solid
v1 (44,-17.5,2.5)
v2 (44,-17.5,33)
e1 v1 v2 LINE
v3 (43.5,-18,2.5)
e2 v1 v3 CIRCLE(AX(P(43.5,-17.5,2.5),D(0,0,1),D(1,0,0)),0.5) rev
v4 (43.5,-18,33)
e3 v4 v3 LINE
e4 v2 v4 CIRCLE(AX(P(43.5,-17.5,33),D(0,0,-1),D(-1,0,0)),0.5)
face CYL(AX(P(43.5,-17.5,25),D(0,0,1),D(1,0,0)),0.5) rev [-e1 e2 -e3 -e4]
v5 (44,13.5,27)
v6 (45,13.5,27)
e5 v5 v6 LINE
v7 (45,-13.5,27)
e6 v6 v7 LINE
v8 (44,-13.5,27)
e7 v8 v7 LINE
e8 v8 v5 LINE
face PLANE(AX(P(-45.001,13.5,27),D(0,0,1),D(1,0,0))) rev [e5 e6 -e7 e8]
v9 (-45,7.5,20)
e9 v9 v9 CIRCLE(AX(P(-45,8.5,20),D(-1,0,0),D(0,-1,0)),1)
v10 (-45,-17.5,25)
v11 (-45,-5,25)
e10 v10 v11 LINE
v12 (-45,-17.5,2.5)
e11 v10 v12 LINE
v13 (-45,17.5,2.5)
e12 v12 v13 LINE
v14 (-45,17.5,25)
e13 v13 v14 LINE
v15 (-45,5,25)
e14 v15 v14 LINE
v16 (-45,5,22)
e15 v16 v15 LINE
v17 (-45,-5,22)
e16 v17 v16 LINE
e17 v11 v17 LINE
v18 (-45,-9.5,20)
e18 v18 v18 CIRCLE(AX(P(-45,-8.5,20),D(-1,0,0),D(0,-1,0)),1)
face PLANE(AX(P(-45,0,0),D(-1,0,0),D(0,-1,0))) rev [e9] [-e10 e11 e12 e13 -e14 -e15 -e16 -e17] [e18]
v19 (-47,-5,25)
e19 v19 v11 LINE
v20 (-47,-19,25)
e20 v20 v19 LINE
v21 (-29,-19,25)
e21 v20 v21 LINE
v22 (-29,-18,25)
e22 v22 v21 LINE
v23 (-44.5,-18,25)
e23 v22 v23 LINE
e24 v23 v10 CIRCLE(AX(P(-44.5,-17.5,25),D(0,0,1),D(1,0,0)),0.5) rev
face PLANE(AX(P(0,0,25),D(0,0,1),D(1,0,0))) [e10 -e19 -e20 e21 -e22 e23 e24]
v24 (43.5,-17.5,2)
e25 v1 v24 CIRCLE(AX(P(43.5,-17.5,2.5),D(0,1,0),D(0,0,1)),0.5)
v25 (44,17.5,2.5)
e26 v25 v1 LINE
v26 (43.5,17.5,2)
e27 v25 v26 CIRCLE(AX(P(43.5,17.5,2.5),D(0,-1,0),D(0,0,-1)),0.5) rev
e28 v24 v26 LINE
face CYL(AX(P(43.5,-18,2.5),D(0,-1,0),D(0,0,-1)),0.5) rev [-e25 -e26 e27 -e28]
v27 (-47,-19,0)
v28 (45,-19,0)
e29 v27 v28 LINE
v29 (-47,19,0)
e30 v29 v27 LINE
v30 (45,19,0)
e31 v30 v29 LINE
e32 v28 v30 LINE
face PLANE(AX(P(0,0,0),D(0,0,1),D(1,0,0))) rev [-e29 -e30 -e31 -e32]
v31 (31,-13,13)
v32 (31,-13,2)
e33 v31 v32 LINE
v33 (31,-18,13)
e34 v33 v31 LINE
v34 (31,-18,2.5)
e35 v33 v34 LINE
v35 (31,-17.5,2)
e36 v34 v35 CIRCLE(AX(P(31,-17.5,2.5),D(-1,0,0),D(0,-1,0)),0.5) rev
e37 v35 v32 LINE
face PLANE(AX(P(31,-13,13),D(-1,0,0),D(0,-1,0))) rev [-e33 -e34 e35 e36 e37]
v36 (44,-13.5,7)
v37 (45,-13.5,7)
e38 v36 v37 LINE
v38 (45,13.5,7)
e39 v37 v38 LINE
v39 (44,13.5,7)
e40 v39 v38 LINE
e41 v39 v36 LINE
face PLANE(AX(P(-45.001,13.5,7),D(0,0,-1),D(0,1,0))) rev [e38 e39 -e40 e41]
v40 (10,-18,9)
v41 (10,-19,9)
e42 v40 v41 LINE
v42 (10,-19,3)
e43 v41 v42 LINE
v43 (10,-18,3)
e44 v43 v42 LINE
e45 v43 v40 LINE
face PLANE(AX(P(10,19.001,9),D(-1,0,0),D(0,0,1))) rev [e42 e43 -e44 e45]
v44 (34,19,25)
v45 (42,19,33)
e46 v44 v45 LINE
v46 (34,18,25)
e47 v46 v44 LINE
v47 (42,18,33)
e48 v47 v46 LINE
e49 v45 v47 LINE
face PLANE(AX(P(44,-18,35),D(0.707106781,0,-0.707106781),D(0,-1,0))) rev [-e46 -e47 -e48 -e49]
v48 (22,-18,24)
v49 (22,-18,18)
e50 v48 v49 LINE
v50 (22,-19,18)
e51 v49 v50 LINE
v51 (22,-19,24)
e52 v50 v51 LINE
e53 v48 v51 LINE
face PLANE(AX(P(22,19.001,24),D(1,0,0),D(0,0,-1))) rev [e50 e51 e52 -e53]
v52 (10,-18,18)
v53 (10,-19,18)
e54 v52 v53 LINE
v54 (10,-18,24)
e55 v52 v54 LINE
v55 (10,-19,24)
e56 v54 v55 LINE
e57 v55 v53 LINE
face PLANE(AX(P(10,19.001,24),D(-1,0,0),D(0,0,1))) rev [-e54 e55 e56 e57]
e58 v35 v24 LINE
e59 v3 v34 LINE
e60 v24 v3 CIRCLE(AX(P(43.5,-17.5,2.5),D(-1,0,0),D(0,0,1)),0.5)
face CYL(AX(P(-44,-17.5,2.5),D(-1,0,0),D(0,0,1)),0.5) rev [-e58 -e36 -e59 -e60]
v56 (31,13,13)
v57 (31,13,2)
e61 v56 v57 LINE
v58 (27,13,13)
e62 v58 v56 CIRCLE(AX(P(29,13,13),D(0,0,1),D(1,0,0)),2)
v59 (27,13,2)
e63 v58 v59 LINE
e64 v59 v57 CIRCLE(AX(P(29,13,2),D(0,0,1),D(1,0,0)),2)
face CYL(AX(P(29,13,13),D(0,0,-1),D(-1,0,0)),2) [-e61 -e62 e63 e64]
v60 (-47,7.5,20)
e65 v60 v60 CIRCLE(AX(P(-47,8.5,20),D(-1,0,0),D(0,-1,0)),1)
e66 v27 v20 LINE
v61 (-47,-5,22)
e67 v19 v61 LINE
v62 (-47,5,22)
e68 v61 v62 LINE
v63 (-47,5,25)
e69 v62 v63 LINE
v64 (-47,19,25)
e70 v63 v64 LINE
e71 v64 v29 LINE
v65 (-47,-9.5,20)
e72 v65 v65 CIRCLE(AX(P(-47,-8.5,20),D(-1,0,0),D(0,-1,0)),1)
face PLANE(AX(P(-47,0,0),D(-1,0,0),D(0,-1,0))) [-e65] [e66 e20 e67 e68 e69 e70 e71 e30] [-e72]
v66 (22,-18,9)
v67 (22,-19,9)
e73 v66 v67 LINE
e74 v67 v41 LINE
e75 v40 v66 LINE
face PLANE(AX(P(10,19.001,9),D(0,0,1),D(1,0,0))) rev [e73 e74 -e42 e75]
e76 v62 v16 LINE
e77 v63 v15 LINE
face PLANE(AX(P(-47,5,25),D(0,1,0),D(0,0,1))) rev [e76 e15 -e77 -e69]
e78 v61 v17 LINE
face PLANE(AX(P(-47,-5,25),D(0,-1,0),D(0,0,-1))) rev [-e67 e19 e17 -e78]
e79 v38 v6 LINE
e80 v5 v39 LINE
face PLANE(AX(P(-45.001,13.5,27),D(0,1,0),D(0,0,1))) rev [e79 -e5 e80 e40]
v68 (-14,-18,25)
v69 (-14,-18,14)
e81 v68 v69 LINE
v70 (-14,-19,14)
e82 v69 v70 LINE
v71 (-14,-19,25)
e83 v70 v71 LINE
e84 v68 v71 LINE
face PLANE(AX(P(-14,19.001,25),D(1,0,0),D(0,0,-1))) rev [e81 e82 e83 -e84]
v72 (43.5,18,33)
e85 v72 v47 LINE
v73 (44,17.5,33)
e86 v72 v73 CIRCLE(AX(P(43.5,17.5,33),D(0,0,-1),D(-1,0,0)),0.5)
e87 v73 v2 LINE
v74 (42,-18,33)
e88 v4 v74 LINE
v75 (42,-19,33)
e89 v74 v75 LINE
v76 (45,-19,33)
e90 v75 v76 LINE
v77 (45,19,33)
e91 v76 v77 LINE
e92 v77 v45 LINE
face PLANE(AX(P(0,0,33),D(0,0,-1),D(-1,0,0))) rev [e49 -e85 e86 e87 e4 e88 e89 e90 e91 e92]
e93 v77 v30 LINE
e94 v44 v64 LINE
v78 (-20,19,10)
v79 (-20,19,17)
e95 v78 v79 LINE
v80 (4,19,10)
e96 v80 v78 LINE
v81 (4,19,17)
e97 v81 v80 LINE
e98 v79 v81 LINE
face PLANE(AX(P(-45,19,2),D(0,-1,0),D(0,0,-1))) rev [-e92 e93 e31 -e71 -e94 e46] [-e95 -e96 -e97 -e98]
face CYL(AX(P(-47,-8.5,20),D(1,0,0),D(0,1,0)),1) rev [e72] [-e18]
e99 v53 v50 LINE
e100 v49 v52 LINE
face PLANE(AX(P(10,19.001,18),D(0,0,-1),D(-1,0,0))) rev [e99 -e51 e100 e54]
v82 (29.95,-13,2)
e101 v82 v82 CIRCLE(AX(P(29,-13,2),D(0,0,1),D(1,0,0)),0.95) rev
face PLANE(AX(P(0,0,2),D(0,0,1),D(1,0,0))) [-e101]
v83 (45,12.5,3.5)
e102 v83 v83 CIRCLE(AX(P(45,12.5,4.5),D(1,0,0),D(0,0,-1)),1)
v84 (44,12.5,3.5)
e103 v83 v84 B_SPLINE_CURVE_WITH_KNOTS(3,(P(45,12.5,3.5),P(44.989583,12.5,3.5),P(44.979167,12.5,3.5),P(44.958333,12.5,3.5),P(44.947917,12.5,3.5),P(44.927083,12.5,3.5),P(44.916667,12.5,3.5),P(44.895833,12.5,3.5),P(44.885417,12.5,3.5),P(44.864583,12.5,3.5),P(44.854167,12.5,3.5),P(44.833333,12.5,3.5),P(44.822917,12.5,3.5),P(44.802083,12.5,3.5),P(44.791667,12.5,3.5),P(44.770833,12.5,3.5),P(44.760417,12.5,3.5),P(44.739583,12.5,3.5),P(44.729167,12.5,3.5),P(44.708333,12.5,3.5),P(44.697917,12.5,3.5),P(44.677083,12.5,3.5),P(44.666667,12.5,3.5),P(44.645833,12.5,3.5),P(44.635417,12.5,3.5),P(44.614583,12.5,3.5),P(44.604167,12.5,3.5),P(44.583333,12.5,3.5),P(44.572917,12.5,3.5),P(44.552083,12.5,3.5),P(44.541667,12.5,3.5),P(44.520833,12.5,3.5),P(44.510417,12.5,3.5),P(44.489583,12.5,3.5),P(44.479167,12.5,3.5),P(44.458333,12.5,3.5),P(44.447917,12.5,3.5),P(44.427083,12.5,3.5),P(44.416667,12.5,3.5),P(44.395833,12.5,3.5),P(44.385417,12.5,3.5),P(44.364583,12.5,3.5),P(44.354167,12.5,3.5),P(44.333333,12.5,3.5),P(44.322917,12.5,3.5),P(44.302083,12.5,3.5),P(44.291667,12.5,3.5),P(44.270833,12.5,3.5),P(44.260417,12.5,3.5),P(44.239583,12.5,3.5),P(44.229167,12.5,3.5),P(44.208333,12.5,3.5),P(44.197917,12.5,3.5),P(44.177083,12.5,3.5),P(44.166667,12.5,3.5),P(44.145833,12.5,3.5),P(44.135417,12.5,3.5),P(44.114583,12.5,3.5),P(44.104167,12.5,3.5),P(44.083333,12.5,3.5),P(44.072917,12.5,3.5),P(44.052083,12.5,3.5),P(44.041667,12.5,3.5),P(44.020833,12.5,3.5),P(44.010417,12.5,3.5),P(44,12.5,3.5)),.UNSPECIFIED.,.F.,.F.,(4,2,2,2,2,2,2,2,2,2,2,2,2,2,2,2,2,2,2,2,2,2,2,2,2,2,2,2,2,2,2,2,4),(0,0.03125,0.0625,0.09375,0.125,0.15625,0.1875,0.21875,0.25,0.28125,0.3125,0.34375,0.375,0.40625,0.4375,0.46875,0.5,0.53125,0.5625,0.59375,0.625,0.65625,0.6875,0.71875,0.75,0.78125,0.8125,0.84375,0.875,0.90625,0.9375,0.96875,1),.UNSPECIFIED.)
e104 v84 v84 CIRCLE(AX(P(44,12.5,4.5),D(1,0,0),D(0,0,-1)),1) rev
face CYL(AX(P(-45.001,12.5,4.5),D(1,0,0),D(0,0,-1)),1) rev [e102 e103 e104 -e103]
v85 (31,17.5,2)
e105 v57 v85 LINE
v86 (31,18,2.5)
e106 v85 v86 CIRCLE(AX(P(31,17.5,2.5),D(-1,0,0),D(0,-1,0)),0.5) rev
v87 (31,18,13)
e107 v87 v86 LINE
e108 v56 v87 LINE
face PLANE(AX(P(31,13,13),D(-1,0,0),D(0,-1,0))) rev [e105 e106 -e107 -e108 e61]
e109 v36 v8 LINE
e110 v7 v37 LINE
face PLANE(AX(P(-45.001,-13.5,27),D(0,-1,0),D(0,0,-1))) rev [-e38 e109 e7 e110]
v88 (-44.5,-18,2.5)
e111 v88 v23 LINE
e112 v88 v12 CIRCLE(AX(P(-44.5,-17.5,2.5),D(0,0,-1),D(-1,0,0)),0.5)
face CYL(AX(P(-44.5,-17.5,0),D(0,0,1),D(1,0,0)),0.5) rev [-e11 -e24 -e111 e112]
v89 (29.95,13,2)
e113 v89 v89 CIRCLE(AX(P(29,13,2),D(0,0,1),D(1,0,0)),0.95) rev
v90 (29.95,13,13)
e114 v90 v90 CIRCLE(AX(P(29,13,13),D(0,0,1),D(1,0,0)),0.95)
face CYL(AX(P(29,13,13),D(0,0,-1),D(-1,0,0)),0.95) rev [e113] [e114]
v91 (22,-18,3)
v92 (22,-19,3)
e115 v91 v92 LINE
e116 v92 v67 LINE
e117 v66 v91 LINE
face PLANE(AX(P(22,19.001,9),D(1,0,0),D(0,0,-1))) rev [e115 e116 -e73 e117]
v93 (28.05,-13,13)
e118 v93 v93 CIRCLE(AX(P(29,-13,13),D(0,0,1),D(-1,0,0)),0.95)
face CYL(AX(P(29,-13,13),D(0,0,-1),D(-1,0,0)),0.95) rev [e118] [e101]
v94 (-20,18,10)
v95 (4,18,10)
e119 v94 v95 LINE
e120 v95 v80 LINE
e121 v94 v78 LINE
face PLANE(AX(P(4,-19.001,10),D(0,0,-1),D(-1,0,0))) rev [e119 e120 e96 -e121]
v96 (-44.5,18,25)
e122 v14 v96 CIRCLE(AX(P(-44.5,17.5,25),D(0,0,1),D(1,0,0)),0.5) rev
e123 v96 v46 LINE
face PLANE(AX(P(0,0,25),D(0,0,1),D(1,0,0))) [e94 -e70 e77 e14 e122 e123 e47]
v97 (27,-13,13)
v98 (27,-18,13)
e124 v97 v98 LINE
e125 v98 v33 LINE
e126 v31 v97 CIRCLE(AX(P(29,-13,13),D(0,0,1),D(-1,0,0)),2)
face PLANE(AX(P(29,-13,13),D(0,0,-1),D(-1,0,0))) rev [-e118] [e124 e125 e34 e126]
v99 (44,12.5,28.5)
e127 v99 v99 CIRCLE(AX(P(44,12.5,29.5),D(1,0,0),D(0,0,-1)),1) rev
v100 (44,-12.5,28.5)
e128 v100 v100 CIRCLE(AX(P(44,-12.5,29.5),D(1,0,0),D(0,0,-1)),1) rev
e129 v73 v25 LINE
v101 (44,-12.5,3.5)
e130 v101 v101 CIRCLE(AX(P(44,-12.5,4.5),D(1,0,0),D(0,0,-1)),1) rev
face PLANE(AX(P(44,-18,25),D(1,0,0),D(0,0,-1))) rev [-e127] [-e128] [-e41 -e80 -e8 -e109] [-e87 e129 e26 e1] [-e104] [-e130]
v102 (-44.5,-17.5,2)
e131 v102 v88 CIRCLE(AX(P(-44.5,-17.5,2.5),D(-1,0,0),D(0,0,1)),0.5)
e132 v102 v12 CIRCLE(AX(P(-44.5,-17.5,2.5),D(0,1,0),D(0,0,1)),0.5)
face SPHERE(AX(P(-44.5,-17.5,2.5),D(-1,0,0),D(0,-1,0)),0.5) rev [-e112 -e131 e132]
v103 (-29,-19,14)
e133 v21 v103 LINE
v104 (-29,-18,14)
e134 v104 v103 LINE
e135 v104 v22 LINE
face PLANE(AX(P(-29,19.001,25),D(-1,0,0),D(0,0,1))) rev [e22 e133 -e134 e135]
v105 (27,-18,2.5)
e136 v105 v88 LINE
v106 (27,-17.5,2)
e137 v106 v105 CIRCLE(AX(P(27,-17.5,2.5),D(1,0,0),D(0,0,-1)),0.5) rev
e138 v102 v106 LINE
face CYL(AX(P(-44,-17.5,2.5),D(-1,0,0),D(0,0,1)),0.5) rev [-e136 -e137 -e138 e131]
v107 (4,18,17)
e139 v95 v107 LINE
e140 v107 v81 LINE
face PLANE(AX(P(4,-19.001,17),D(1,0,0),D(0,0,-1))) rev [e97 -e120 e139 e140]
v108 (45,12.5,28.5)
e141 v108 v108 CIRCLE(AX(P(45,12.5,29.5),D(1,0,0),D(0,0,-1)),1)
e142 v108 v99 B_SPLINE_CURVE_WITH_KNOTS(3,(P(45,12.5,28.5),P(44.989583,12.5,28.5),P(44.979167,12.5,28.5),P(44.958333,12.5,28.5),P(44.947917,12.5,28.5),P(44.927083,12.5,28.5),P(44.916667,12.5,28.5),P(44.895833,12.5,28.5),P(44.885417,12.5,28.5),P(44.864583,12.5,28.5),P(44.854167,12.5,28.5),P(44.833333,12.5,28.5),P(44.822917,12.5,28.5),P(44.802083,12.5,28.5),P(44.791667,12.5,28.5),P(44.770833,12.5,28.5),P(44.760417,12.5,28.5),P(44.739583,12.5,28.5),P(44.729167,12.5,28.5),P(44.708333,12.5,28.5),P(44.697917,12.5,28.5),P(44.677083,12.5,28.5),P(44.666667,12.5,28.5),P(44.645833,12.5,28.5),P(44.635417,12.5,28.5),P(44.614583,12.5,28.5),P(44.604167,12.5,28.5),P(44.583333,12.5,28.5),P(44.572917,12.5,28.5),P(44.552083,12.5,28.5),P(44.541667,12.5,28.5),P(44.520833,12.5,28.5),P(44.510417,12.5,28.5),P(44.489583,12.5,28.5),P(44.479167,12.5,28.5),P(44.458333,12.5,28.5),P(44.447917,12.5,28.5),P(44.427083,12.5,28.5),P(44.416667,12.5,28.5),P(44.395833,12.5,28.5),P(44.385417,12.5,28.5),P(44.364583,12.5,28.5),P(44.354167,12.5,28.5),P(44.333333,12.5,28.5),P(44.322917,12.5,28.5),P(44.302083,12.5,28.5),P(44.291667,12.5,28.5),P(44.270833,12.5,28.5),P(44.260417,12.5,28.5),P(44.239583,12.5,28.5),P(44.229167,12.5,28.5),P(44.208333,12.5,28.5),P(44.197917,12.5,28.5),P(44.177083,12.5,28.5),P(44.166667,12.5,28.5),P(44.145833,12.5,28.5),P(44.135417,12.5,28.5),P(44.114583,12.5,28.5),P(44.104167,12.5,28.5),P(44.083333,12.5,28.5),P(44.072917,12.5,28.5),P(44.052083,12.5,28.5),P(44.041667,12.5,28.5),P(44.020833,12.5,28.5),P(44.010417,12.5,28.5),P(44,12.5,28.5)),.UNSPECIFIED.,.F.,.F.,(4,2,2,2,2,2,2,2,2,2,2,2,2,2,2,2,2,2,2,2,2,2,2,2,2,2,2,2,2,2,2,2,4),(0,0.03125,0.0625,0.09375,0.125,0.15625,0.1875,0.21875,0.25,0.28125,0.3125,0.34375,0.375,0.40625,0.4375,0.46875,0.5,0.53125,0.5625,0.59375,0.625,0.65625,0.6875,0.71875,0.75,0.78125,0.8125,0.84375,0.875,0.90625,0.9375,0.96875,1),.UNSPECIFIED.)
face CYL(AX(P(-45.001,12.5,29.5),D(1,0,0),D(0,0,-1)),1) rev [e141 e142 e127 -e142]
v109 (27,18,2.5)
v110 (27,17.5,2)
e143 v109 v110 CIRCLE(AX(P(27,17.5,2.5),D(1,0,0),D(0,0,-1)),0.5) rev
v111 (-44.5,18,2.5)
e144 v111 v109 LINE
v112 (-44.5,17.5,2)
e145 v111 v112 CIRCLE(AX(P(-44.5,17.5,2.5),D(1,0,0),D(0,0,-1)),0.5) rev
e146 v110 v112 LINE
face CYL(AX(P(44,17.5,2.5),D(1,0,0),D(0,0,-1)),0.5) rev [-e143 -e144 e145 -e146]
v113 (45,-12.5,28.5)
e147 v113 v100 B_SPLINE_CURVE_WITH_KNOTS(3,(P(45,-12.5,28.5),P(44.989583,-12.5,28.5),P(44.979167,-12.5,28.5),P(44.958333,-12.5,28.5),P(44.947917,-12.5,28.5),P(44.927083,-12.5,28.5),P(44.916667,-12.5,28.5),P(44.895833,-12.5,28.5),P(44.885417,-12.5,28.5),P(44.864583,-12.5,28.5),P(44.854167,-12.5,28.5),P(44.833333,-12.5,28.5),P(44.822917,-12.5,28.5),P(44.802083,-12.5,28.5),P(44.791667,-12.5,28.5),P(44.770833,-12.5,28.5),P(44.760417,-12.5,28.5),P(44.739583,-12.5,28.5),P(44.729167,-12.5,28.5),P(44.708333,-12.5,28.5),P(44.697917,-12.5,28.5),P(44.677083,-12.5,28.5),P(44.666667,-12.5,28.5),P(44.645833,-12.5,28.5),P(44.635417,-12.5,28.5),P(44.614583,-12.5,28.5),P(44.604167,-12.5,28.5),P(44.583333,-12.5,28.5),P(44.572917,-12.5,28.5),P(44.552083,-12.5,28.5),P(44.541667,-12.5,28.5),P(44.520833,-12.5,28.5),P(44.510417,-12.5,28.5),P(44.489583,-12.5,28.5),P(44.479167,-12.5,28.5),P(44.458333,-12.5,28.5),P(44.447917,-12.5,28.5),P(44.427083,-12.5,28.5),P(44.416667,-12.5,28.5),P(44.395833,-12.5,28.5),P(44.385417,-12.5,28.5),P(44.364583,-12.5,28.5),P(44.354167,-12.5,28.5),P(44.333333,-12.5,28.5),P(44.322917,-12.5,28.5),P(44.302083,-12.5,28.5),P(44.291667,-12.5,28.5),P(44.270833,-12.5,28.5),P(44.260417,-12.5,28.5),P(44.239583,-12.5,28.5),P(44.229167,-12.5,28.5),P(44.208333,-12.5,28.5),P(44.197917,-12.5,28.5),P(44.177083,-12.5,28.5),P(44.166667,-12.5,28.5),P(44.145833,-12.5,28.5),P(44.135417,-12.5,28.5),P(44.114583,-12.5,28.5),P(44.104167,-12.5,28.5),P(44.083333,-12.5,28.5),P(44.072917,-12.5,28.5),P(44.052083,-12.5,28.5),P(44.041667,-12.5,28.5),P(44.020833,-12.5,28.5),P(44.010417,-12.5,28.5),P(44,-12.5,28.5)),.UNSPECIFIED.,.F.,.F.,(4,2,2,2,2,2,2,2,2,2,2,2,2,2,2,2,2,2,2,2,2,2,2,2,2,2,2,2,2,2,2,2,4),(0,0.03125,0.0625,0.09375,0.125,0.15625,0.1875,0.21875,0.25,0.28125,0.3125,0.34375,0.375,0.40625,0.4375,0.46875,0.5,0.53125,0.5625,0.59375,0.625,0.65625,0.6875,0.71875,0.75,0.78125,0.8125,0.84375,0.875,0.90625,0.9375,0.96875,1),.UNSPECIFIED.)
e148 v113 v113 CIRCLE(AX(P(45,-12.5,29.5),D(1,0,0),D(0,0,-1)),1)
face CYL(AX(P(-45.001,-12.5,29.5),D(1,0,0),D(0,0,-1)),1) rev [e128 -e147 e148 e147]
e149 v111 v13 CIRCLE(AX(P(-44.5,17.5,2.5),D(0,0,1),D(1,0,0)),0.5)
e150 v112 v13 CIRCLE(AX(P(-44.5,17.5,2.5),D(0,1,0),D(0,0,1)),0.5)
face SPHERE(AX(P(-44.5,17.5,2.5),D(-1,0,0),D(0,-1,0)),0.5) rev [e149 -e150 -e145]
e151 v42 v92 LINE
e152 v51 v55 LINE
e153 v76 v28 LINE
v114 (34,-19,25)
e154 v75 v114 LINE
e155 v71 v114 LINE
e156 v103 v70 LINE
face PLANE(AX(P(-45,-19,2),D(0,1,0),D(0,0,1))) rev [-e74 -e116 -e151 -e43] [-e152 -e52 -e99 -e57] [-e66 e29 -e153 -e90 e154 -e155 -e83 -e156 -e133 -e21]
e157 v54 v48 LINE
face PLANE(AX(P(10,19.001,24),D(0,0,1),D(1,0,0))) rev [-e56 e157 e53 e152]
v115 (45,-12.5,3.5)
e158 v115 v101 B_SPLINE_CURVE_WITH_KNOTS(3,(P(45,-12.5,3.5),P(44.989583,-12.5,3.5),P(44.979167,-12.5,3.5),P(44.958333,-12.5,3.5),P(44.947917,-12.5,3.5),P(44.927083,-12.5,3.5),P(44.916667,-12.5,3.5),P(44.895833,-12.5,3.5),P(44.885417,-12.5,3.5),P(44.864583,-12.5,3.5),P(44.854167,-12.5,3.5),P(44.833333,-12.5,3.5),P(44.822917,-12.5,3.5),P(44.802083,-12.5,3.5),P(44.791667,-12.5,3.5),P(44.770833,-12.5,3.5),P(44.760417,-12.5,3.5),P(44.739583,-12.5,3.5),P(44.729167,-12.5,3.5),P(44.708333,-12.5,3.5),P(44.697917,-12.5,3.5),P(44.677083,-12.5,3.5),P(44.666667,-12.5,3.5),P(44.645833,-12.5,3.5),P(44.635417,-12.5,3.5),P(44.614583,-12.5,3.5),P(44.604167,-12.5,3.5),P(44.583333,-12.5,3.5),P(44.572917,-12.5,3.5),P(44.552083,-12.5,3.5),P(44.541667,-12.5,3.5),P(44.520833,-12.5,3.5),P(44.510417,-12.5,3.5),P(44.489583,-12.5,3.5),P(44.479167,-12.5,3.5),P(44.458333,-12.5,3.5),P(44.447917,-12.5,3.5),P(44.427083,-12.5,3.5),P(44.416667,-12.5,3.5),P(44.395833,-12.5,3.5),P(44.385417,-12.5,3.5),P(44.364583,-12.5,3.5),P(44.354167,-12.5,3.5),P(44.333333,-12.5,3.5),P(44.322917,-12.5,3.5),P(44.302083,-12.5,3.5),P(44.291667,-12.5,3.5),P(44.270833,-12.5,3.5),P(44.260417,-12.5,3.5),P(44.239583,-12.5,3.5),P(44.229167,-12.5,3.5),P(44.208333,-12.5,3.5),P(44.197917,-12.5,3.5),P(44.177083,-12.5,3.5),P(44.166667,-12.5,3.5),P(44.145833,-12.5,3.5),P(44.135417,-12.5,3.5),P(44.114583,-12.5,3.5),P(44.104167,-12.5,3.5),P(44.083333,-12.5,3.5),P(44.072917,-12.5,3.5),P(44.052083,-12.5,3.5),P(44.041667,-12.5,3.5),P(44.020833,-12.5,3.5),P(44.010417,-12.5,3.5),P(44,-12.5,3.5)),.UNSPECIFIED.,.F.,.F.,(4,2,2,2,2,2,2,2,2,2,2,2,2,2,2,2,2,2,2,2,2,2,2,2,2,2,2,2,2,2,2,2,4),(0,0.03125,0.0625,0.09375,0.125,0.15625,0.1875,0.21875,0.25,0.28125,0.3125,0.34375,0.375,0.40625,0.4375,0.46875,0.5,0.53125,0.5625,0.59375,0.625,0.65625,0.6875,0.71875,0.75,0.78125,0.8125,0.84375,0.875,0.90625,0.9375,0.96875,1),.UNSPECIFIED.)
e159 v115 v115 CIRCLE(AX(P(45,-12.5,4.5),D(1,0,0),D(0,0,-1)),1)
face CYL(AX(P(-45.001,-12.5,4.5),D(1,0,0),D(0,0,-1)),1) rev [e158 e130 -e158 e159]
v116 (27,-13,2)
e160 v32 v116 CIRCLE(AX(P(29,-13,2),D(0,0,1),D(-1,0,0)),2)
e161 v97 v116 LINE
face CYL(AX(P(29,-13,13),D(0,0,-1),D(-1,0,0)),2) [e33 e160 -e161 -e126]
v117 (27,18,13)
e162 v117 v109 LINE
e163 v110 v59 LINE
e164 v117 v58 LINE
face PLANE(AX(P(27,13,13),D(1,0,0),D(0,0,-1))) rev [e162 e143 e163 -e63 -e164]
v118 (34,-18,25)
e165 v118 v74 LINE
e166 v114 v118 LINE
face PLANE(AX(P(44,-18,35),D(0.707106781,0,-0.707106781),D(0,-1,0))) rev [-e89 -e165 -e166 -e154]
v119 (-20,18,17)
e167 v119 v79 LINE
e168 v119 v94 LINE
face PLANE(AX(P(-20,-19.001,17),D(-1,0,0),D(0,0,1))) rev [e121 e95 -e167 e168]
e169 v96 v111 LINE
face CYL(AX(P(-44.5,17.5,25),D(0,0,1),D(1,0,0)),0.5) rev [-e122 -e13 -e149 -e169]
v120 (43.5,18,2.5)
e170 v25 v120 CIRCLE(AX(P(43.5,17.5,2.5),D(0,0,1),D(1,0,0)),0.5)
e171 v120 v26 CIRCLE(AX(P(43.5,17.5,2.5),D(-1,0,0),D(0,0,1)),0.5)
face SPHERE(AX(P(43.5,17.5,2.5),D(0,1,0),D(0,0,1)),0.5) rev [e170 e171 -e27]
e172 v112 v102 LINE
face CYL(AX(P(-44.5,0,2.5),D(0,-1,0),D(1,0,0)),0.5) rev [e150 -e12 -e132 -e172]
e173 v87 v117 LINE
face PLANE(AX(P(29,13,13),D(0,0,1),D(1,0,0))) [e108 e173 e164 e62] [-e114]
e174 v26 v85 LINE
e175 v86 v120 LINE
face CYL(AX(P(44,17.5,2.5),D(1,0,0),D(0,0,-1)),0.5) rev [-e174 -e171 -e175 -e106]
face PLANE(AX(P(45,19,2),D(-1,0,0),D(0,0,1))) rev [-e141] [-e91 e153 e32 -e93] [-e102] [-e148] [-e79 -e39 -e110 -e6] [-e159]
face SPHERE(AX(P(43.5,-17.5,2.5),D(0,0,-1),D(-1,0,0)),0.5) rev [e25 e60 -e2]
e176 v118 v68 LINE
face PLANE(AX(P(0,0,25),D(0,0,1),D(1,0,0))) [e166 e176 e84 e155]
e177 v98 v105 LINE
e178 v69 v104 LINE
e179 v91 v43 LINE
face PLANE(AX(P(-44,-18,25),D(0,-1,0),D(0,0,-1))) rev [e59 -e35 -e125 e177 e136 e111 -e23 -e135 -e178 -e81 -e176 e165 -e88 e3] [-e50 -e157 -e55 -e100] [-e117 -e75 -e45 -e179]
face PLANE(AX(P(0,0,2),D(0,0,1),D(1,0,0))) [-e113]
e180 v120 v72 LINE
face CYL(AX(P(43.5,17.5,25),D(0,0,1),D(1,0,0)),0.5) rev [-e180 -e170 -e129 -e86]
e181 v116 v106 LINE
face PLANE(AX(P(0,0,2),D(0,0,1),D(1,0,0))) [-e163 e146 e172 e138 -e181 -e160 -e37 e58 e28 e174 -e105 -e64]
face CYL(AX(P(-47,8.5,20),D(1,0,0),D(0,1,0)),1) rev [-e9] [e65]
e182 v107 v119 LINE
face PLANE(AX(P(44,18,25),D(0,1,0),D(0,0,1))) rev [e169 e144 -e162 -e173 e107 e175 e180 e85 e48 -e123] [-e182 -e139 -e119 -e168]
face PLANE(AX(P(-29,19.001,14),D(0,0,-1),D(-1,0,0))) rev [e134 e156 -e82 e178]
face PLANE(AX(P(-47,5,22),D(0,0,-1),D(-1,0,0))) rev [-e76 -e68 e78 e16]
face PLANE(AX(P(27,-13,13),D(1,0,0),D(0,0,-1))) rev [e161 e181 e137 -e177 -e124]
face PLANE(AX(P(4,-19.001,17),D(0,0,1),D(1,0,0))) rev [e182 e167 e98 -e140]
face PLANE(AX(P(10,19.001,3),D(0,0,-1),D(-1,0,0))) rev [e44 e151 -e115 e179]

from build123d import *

# Parameters (mm, degrees)
SKETCH_1_W          = 90
SKETCH_1_H          = 38
EXTRUDE_1_DEPTH     = 2
EXTRUDE_2_DEPTH     = 23
CUT_EXTRUDE_1_REACH = 65.984
SKETCH_3_W          = 12
SKETCH_3_H          = 6
SKETCH_3_W_2        = 15
SKETCH_3_H_2        = 11
CUT_EXTRUDE_2_REACH = 65.984
SKETCH_4_W          = 24
SKETCH_4_H          = 7
SKETCH_7_W          = 1
SKETCH_7_H          = 38
EXTRUDE_3_DEPTH     = 8
CUT_EXTRUDE_3_REACH = 99.724
SKETCH_6_W          = 20
SKETCH_6_H          = 27
CUT_EXTRUDE_4_REACH = 99.724
SKETCH_8_R          = 1
CHAMFER_1_SIZE      = 10
FILLET_1_R          = 0.5
SKETCH_10_R         = 0.95
EXTRUDE_4_DEPTH     = 11
SKETCH_11_R         = 1
EXTRUDE_5_DEPTH     = 2
FILLET_2_R          = 0.5


with BuildPart() as part:
    # 草图1 → 凸台-拉伸1 (new body)
    with BuildSketch(Plane.XY):
        Rectangle(SKETCH_1_W, SKETCH_1_H)
    extrude(amount=EXTRUDE_1_DEPTH)

    # 草图2 → 凸台-拉伸2 (add)
    with BuildSketch(Plane.XY.offset(2)):
        Polygon((44, 18), (-44, 18), (-45, 18), (-45, 19), (45, 19), (45, -19), (-45, -19), (-45, -18), (-44, -18), (44, -18), align=None)
    extrude(amount=EXTRUDE_2_DEPTH)

    # 草图3 → 切除-拉伸1 (cut, up to next)
    with BuildSketch(Plane.XZ.offset(19), mode=Mode.PRIVATE) as cut_extrude_1_sk1:
        with Locations((16, 6)):
            Rectangle(SKETCH_3_W, SKETCH_3_H)
    cut_extrude_1_tool1 = extrude(cut_extrude_1_sk1.sketch, amount=-CUT_EXTRUDE_1_REACH, mode=Mode.PRIVATE) & part.part
    # 草图3 → 切除-拉伸1 (cut, up to next)
    with BuildSketch(Plane.XZ.offset(19), mode=Mode.PRIVATE) as cut_extrude_1_sk2:
        with Locations((16, 21)):
            Rectangle(SKETCH_3_W, SKETCH_3_H)
    cut_extrude_1_tool2 = extrude(cut_extrude_1_sk2.sketch, amount=-CUT_EXTRUDE_1_REACH, mode=Mode.PRIVATE) & part.part
    # 草图3 → 切除-拉伸1 (cut, up to next)
    with BuildSketch(Plane.XZ.offset(19), mode=Mode.PRIVATE) as cut_extrude_1_sk3:
        with Locations((-21.5, 19.5)):
            Rectangle(SKETCH_3_W_2, SKETCH_3_H_2)
    cut_extrude_1_tool3 = extrude(cut_extrude_1_sk3.sketch, amount=-CUT_EXTRUDE_1_REACH, mode=Mode.PRIVATE) & part.part
    add(cut_extrude_1_tool1.solids().sort_by_distance((16, -19, 6))[0], mode=Mode.SUBTRACT)
    add(cut_extrude_1_tool2.solids().sort_by_distance((16, -19, 21))[0], mode=Mode.SUBTRACT)
    add(cut_extrude_1_tool3.solids().sort_by_distance((-21.5, -19, 19.5))[0], mode=Mode.SUBTRACT)

    # 草图4 → 切除-拉伸2 (cut, up to next)
    with BuildSketch(Plane(origin=(0, 19, 0), x_dir=(1, 0, 0), z_dir=(0, 1, 0)), mode=Mode.PRIVATE) as cut_extrude_2_sk1:
        with Locations((-8, -13.5)):
            Rectangle(SKETCH_4_W, SKETCH_4_H)
    cut_extrude_2_tool1 = extrude(cut_extrude_2_sk1.sketch, amount=-CUT_EXTRUDE_2_REACH, mode=Mode.PRIVATE) & part.part
    add(cut_extrude_2_tool1.solids().sort_by_distance((-8, 19, 13.5))[0], mode=Mode.SUBTRACT)

    # 草图7 → 凸台-拉伸3 (add)
    with BuildSketch(Plane.XY.offset(25)):
        with Locations((44.5, 0)):
            Rectangle(SKETCH_7_W, SKETCH_7_H)
    extrude(amount=EXTRUDE_3_DEPTH)

    # 草图6 → 切除-拉伸3 (cut, up to next)
    with BuildSketch(Plane(origin=(45, 0, 0), x_dir=(0, 0, -1), z_dir=(1, 0, 0)), mode=Mode.PRIVATE) as cut_extrude_3_sk1:
        with Locations((-17, 0)):
            Rectangle(SKETCH_6_W, SKETCH_6_H)
    cut_extrude_3_tool1 = extrude(cut_extrude_3_sk1.sketch, amount=-CUT_EXTRUDE_3_REACH, mode=Mode.PRIVATE) & part.part
    add(cut_extrude_3_tool1.solids().sort_by_distance((45, 0, 17))[0], mode=Mode.SUBTRACT)

    # 草图8 → 切除-拉伸4 (cut, up to next)
    with BuildSketch(Plane(origin=(45, 0, 0), x_dir=(0, 0, -1), z_dir=(1, 0, 0)), mode=Mode.PRIVATE) as cut_extrude_4_sk1:
        with Locations((-29.5, 12.5)):
            Circle(SKETCH_8_R)
    cut_extrude_4_tool1 = extrude(cut_extrude_4_sk1.sketch, amount=-CUT_EXTRUDE_4_REACH, mode=Mode.PRIVATE) & part.part
    # 草图8 → 切除-拉伸4 (cut, up to next)
    with BuildSketch(Plane(origin=(45, 0, 0), x_dir=(0, 0, -1), z_dir=(1, 0, 0)), mode=Mode.PRIVATE) as cut_extrude_4_sk2:
        with Locations((-29.5, -12.5)):
            Circle(SKETCH_8_R)
    cut_extrude_4_tool2 = extrude(cut_extrude_4_sk2.sketch, amount=-CUT_EXTRUDE_4_REACH, mode=Mode.PRIVATE) & part.part
    # 草图8 → 切除-拉伸4 (cut, up to next)
    with BuildSketch(Plane(origin=(45, 0, 0), x_dir=(0, 0, -1), z_dir=(1, 0, 0)), mode=Mode.PRIVATE) as cut_extrude_4_sk3:
        with Locations((-4.5, -12.5)):
            Circle(SKETCH_8_R)
    cut_extrude_4_tool3 = extrude(cut_extrude_4_sk3.sketch, amount=-CUT_EXTRUDE_4_REACH, mode=Mode.PRIVATE) & part.part
    # 草图8 → 切除-拉伸4 (cut, up to next)
    with BuildSketch(Plane(origin=(45, 0, 0), x_dir=(0, 0, -1), z_dir=(1, 0, 0)), mode=Mode.PRIVATE) as cut_extrude_4_sk4:
        with Locations((-4.5, 12.5)):
            Circle(SKETCH_8_R)
    cut_extrude_4_tool4 = extrude(cut_extrude_4_sk4.sketch, amount=-CUT_EXTRUDE_4_REACH, mode=Mode.PRIVATE) & part.part
    add(cut_extrude_4_tool1.solids().sort_by_distance((45, 12.5, 29.5))[0], mode=Mode.SUBTRACT)
    add(cut_extrude_4_tool2.solids().sort_by_distance((45, -12.5, 29.5))[0], mode=Mode.SUBTRACT)
    add(cut_extrude_4_tool3.solids().sort_by_distance((45, -12.5, 4.5))[0], mode=Mode.SUBTRACT)
    add(cut_extrude_4_tool4.solids().sort_by_distance((45, 12.5, 4.5))[0], mode=Mode.SUBTRACT)

    # 倒角1
    # the kernel refuses this chamfer: 10 mm, written as the material it adds along each edge
    with BuildSketch(Plane(origin=(44, 19, 25), x_dir=(-0.9996219169112968, 0, -0.027495876610586317), z_dir=(0, -1, 0))) as chamfer_1_piece_1_section:
        Polygon((CHAMFER_1_SIZE * 0.999621916911, -CHAMFER_1_SIZE * 0.0274958766106), (-CHAMFER_1_SIZE * 0.0274958766106, -CHAMFER_1_SIZE * 0.999621916911), (0, 0), align=None)
    chamfer_1_piece_1 = extrude(amount=1, mode=Mode.PRIVATE)
    chamfer_1_piece_1 = split(chamfer_1_piece_1, bisect_by=Plane(origin=(39.481481481, 18.5, 33), z_dir=(0, 0, -1)), keep=Keep.TOP, mode=Mode.PRIVATE)
    add(chamfer_1_piece_1)
    with BuildSketch(Plane(origin=(44, -18, 25), x_dir=(0.027495876610586317, 0, 0.9996219169112968), z_dir=(0, -1, 0))) as chamfer_1_piece_2_section:
        Polygon((CHAMFER_1_SIZE * 0.999621916911, CHAMFER_1_SIZE * 0.0274958766106), (-CHAMFER_1_SIZE * 0.0274958766106, CHAMFER_1_SIZE * 0.999621916911), (0, 0), align=None)
    chamfer_1_piece_2 = extrude(amount=1, mode=Mode.PRIVATE)
    chamfer_1_piece_2 = split(chamfer_1_piece_2, bisect_by=Plane(origin=(41.2, -18.5, 33), z_dir=(0, 0, -1)), keep=Keep.TOP, mode=Mode.PRIVATE)
    add(chamfer_1_piece_2)

    # 圆角1
    fillet_1_edges = [part.edges().sort_by_distance(p)[0] for p in [
        (-0.5, 18, 2),
        (44, 0, 2),
        (44, 18, 17.5),
        (-0.5, -18, 2),
        (44, -18, 17.5),
    ]]
    fillet(fillet_1_edges, radius=FILLET_1_R)

    # 草图10 → 凸台-拉伸4 (add)
    # profile 1 of 2: a face of its own
    with BuildSketch(Plane.XY.offset(2)):
        with BuildLine():
            Line((31, 13), (31, 18))
            Line((31, 18), (27, 18))
            Line((27, 18), (27, 13))
            ThreePointArc((27, 13), (29, 11), (31, 13))
        make_face()
        with Locations((29, 13)):
            Circle(SKETCH_10_R, mode=Mode.SUBTRACT)
    # profile 2 of 2: a face of its own
    with BuildSketch(Plane.XY.offset(2)):
        with BuildLine():
            Line((31, -13), (31, -18))
            Line((31, -18), (27, -18))
            Line((27, -18), (27, -13))
            ThreePointArc((27, -13), (29, -11), (31, -13))
        make_face()
        with Locations(Location((29, -13, 0), (0, 0, 180))):
            Circle(SKETCH_10_R, mode=Mode.SUBTRACT)
    extrude(amount=EXTRUDE_4_DEPTH)

    # 草图11 → 凸台-拉伸5 (add)
    with BuildSketch(Plane.ZY.offset(45)):
        Polygon((0, 19), (25, 19), (25, 5), (22, 5), (22, -5), (25, -5), (25, -19), (0, -19), align=None)
        with Locations(Location((20, 8.5, 0), (0, 0, 270))):
            Circle(SKETCH_11_R, mode=Mode.SUBTRACT)
        with Locations(Location((20, -8.5, 0), (0, 0, 270))):
            Circle(SKETCH_11_R, mode=Mode.SUBTRACT)
    extrude(amount=EXTRUDE_5_DEPTH)

    # 圆角2
    fillet_2_edges = [part.edges().sort_by_distance(p)[0] for p in [
        (-45, 18, 13.75),
        (-45, 0, 2),
        (-45, -17.853553391, 2.146446609),
        (-45, 17.853553391, 2.146446609),
        (-45, -18, 13.75),
    ]]
    fillet(fillet_2_edges, radius=FILLET_2_R)


solid = part.part
